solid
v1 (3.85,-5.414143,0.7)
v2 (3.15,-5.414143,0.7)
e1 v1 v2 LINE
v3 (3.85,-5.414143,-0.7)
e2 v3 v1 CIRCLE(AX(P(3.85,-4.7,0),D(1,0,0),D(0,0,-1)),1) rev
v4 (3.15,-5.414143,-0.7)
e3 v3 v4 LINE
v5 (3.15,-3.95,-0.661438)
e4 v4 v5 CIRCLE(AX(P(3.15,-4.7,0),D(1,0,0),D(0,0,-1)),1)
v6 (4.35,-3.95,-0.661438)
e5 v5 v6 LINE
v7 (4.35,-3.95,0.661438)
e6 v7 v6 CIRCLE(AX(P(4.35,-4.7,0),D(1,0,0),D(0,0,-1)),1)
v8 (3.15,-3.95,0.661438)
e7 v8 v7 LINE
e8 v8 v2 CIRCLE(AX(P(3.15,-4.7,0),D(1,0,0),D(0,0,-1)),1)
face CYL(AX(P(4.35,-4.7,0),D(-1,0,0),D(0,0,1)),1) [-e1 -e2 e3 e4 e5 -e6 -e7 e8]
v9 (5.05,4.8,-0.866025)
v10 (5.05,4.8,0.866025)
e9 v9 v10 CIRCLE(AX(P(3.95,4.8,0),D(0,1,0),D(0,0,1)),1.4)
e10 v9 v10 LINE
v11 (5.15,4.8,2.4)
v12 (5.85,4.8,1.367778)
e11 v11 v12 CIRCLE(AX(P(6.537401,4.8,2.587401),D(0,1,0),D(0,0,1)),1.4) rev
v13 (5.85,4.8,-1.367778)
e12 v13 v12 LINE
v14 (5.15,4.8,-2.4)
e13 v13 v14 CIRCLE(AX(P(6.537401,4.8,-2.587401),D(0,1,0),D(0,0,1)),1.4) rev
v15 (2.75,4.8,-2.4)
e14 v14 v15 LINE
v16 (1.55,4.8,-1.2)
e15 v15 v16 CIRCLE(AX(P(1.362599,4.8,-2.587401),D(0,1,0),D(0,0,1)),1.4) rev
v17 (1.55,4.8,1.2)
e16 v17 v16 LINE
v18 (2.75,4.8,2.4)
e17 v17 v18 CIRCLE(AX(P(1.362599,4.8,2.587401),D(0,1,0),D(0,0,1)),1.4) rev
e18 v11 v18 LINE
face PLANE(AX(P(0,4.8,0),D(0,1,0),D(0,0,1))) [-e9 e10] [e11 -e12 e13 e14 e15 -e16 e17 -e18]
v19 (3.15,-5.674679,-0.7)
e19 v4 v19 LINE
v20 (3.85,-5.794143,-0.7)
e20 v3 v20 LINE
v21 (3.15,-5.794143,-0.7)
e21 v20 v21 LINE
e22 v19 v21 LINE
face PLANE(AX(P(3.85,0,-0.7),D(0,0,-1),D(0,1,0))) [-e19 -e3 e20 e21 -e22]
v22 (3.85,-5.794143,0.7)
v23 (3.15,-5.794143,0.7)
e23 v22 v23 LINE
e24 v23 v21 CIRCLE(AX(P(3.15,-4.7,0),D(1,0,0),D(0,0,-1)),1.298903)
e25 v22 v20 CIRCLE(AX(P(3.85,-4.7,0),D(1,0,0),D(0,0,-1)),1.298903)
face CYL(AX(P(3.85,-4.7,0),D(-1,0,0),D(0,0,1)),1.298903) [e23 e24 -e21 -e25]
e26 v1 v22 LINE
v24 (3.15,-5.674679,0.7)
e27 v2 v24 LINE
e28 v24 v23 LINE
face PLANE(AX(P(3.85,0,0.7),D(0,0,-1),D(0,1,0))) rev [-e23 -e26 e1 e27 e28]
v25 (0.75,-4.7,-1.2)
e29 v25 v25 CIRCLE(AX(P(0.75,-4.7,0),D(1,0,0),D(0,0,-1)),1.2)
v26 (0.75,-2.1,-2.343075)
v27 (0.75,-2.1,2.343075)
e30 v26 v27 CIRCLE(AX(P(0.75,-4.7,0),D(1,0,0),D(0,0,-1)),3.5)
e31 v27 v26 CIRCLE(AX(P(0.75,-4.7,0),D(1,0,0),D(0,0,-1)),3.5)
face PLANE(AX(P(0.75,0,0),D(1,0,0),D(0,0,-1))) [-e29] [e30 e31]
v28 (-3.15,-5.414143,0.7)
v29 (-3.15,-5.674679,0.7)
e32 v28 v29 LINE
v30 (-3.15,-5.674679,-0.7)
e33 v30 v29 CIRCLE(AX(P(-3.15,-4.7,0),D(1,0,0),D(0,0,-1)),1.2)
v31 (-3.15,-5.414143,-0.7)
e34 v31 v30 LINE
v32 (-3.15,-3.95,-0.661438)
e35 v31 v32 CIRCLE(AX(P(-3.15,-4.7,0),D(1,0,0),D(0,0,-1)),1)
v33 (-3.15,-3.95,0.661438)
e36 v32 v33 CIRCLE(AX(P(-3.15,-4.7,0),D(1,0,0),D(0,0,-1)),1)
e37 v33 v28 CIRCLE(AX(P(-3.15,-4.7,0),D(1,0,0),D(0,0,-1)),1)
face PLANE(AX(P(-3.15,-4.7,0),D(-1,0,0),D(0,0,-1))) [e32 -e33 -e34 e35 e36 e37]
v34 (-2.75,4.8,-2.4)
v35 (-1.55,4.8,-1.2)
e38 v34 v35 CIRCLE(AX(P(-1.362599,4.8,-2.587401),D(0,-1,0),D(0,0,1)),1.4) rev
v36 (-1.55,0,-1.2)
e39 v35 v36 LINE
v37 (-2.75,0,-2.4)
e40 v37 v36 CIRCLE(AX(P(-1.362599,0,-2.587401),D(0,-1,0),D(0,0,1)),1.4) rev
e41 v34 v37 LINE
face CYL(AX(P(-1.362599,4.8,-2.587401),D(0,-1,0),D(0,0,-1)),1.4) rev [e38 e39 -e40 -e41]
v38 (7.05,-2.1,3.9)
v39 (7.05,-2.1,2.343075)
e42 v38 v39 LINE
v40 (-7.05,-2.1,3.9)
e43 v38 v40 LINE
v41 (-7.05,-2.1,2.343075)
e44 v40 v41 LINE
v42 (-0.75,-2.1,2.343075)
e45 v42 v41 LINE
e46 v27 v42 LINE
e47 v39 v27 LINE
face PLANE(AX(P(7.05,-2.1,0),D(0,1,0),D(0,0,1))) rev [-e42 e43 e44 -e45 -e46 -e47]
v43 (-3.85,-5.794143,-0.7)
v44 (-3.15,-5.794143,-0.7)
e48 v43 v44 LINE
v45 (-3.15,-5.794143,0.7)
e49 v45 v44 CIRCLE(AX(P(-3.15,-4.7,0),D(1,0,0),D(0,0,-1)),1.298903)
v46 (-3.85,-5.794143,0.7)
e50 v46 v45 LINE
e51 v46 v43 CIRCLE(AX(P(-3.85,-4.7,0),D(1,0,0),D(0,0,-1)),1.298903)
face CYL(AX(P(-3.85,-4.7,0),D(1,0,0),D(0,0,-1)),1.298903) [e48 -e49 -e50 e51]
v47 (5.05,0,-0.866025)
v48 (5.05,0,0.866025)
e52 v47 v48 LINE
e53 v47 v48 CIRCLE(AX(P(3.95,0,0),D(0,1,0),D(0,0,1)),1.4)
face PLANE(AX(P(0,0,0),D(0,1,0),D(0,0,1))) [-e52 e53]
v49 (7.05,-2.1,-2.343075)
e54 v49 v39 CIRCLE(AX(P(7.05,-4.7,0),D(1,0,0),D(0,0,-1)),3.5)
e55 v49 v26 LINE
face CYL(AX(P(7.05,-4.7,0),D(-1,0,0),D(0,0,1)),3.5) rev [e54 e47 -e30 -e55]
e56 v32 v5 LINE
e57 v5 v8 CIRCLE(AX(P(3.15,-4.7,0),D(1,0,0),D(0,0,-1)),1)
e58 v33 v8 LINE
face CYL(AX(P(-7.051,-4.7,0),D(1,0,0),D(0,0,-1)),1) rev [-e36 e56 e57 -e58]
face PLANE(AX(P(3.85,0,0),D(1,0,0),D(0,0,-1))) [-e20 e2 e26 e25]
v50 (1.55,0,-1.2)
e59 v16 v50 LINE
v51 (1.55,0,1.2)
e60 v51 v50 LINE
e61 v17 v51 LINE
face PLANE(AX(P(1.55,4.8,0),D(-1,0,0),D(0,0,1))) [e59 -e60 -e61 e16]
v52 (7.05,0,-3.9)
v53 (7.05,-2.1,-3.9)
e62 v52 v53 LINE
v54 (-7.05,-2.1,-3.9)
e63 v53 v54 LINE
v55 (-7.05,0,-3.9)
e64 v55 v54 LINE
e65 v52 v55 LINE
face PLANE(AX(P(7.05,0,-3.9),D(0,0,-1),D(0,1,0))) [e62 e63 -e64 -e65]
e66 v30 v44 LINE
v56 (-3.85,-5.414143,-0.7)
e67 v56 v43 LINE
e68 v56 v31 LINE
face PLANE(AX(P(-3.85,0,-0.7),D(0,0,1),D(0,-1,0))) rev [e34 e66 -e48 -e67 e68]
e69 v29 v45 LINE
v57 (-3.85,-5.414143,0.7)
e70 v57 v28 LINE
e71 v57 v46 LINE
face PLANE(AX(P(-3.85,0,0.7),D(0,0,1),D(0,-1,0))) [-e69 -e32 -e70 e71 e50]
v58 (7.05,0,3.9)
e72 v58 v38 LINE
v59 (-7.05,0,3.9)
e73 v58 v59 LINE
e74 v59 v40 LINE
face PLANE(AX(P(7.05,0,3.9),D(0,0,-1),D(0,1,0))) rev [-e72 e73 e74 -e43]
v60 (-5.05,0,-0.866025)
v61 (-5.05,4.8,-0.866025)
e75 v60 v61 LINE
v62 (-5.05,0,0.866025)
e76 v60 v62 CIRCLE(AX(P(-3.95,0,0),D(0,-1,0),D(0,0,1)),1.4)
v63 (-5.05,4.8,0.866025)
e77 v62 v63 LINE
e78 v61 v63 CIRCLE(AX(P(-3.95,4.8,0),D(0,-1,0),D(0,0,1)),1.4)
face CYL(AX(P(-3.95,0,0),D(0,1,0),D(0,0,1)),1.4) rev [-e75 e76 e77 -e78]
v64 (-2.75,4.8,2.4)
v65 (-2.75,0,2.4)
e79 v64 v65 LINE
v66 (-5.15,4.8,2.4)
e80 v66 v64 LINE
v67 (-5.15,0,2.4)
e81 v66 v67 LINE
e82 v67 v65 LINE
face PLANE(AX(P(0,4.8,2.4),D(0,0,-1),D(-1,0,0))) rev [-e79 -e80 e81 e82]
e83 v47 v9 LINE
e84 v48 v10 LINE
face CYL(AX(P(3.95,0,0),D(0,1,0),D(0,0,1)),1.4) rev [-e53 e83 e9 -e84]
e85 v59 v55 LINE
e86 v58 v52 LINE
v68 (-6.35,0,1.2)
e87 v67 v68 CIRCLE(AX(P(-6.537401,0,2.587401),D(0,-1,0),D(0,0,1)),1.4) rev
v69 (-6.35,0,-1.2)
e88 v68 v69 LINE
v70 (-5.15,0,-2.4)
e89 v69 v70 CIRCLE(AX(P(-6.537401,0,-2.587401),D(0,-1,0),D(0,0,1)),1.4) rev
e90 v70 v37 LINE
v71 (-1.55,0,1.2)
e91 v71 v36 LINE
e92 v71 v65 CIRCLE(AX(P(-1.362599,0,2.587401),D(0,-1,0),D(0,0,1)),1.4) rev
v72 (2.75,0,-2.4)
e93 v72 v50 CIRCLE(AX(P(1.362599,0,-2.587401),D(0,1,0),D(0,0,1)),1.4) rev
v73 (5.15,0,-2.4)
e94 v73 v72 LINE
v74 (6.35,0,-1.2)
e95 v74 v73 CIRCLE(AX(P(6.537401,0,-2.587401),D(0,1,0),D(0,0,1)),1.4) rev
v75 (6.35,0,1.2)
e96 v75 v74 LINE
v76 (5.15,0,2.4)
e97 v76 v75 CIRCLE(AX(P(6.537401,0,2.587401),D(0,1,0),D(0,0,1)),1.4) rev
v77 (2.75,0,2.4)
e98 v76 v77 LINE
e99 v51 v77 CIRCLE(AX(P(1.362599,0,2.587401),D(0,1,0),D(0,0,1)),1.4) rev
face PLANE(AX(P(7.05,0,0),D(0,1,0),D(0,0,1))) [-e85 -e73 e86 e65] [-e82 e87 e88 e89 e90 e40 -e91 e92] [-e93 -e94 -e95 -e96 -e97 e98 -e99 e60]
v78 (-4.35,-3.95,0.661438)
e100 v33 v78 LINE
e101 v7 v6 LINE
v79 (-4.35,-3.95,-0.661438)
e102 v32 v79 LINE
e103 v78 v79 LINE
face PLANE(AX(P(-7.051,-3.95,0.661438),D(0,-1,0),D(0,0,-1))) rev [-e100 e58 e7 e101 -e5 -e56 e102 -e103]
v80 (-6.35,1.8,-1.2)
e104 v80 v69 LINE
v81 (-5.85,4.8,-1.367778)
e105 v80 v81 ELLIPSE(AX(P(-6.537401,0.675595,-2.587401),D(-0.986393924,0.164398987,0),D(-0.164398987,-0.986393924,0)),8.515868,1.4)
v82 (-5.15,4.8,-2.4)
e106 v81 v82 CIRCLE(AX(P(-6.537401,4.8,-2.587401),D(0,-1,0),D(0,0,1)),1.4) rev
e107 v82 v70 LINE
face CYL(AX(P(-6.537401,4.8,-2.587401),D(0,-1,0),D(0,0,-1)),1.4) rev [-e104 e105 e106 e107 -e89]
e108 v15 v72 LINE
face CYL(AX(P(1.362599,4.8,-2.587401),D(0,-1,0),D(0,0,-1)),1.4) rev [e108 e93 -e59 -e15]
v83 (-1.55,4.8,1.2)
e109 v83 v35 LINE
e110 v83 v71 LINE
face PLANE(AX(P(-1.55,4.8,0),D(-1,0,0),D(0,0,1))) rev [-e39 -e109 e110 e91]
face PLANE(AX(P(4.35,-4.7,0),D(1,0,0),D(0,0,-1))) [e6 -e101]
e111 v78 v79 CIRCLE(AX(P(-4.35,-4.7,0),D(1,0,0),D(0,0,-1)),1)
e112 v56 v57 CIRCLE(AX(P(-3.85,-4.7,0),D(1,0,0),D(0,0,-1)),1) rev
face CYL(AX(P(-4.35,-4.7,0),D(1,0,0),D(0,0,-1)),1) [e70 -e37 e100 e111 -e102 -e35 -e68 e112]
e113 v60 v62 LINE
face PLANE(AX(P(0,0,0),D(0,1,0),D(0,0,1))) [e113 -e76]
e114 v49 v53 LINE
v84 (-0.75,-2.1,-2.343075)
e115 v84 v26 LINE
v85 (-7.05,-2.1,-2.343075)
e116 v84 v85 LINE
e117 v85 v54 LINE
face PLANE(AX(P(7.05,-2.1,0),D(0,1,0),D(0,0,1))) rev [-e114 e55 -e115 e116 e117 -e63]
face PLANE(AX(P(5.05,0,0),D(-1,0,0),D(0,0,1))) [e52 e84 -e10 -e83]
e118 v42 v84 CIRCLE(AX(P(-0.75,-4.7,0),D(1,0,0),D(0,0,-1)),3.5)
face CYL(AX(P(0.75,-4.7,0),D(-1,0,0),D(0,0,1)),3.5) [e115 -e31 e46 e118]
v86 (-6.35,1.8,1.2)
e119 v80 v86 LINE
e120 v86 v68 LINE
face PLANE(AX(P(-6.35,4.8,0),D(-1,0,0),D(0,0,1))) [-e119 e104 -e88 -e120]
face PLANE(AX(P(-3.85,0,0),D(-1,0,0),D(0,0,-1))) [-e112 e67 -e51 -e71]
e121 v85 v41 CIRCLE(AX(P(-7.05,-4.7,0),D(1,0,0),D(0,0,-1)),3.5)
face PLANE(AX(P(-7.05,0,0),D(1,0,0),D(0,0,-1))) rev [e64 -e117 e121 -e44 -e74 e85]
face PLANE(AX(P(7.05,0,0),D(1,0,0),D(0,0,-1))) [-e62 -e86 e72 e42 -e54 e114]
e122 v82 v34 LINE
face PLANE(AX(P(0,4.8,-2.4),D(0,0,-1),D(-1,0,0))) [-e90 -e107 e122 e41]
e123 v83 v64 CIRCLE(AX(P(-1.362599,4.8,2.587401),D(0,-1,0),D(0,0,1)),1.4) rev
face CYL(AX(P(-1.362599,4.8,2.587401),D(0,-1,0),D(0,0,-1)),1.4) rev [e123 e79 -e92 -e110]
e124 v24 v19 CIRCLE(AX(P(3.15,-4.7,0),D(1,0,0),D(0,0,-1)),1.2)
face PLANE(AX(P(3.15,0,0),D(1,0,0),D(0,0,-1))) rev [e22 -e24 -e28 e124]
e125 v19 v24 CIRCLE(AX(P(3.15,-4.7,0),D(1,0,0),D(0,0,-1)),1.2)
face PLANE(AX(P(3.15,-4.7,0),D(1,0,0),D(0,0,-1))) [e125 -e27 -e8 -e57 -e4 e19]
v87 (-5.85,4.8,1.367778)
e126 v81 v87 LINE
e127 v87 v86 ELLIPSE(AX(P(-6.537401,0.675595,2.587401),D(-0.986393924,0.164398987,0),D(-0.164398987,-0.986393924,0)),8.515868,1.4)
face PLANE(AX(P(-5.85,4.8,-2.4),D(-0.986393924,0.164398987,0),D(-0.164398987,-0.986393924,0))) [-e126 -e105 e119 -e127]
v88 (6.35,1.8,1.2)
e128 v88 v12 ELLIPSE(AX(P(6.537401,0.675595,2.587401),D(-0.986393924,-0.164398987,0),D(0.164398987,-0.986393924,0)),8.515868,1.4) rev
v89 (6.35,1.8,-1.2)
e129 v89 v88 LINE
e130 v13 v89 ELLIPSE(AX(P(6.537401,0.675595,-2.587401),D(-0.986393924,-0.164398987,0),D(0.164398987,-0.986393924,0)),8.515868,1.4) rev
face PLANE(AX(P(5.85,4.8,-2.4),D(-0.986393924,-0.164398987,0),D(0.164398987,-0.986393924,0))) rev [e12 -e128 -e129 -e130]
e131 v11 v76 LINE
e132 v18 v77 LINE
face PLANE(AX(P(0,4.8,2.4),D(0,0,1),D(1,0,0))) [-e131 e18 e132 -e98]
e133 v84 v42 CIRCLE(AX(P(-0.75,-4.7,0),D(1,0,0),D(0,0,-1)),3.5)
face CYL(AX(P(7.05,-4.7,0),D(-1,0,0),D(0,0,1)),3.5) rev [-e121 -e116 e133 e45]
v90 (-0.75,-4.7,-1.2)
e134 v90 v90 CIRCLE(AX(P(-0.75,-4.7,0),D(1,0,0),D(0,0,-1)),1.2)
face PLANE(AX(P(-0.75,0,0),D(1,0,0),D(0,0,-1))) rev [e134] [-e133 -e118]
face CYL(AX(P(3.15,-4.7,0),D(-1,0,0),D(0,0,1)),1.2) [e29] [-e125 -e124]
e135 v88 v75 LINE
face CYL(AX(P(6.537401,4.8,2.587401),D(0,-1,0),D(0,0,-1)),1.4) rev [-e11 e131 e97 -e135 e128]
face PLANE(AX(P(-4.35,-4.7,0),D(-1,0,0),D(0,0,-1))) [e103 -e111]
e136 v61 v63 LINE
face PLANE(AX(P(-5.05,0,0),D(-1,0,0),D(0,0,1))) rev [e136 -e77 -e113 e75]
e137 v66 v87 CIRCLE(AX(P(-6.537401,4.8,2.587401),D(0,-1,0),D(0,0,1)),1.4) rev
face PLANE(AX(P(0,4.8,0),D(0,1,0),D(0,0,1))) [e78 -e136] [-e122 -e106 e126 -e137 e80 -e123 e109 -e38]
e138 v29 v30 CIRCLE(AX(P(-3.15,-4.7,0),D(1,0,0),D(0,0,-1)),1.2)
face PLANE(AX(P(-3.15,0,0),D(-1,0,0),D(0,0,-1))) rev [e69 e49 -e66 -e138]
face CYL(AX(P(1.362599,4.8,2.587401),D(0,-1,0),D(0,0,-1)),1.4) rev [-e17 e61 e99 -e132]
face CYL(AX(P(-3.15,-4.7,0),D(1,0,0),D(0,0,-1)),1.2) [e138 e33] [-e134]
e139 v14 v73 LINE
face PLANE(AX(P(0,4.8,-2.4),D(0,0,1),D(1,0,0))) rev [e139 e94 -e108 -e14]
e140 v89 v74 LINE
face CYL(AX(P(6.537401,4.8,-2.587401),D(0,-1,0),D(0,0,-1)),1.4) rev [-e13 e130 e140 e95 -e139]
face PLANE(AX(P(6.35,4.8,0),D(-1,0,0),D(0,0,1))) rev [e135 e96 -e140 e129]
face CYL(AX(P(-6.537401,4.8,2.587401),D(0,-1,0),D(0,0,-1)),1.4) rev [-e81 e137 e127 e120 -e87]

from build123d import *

# Parameters (mm, degrees)
SALIENTE_EXTRUIR1_DEPTH = 7.05
SALIENTE_EXTRUIR2_DEPTH = 0.75
CROQUIS2_R              = 1.2
SALIENTE_EXTRUIR3_DEPTH = 2.4
CROQUIS3_R              = 1
SALIENTE_EXTRUIR4_DEPTH = 1.2
CORTAR_EXTRUIR1_REACH   = 16.574
SALIENTE_EXTRUIR5_DEPTH = 0.7
SALIENTE_EXTRUIR6_DEPTH = 4.8
CORTAR_EXTRUIR2_DEPTH   = 4.8
CORTAR_EXTRUIR4_DEPTH   = 4.8


with BuildPart() as part:
    # Croquis1 → Saliente-Extruir1 (new, symmetric)
    with BuildSketch(Plane(origin=(0, 0, 0), x_dir=(0, 0, -1), z_dir=(1, 0, 0))):
        with BuildLine():
            ThreePointArc((-2.343074903, -2.1), (0, -1.2), (2.343074903, -2.1))
            Line((2.343074903, -2.1), (3.9, -2.1))
            Line((3.9, -2.1), (3.9, 0))
            Line((3.9, 0), (-3.9, 0))
            Line((-3.9, 0), (-3.9, -2.1))
            Line((-3.9, -2.1), (-2.343074903, -2.1))
        make_face()
    extrude(amount=SALIENTE_EXTRUIR1_DEPTH, both=True)

    # Croquis1<3> → Saliente-Extruir2 (add, symmetric)
    with BuildSketch(Plane(origin=(0, 0, 0), x_dir=(0, 0, -1), z_dir=(1, 0, 0))):
        with BuildLine():
            ThreePointArc((3.5, -4.7), (3.197714978, -3.277108957), (2.343074903, -2.1))
            ThreePointArc((2.343074903, -2.1), (0, -1.2), (-2.343074903, -2.1))
            ThreePointArc((-2.343074903, -2.1), (-1.422891043, -7.897714978), (3.5, -4.7))
        make_face()
    extrude(amount=SALIENTE_EXTRUIR2_DEPTH, both=True)

    # Croquis2 → Saliente-Extruir3 (add)
    with BuildSketch(Plane(origin=(0.75, 0, 0), x_dir=(0, 0, -1), z_dir=(1, 0, 0))):
        with Locations((0, -4.7)):
            Circle(CROQUIS2_R)
    saliente_extruir3 = extrude(amount=SALIENTE_EXTRUIR3_DEPTH)

    # Croquis3 → Saliente-Extruir4 (add)
    with BuildSketch(Plane(origin=(3.15, 0, 0), x_dir=(0, 0, -1), z_dir=(1, 0, 0))):
        with Locations((0, -4.7)):
            Circle(CROQUIS3_R)
    saliente_extruir4 = extrude(amount=SALIENTE_EXTRUIR4_DEPTH)

    # Croquis4 → Cortar-Extruir1 (cut, up to next)
    with BuildSketch(Plane(origin=(4.35, 0, 0), x_dir=(0, 0, -1), z_dir=(1, 0, 0)), mode=Mode.PRIVATE) as cortar_extruir1_sk1:
        with BuildLine():
            Line((-0.661437828, -3.95), (0.661437828, -3.95))
            ThreePointArc((0.661437828, -3.95), (0, -3.7), (-0.661437828, -3.95))
        make_face()
    cortar_extruir1_tool1 = extrude(cortar_extruir1_sk1.sketch, amount=-CORTAR_EXTRUIR1_REACH, mode=Mode.PRIVATE) & part.part
    cortar_extruir1 = cortar_extruir1_tool1.solids().sort_by_distance((4.35, -3.848845, 0))[0]
    add(cortar_extruir1, mode=Mode.SUBTRACT)

    # Croquis5 → Saliente-Extruir5 (add)
    with BuildSketch(Plane(origin=(3.15, 0, 0), x_dir=(0, 0, -1), z_dir=(1, 0, 0))):
        with BuildLine():
            ThreePointArc((0.7, -5.414142843), (0, -5.7), (-0.7, -5.414142843))
            Line((-0.7, -5.414142843), (-0.7, -5.794142843))
            ThreePointArc((-0.7, -5.794142843), (0, -5.99890283), (0.7, -5.794142843))
            Line((0.7, -5.794142843), (0.7, -5.414142843))
        make_face()
    saliente_extruir5 = extrude(amount=SALIENTE_EXTRUIR5_DEPTH)

    # Croquis6 → Saliente-Extruir6 (add)
    with BuildSketch(Plane(origin=(0, 0, 0), x_dir=(1, 0, 0), z_dir=(0, 1, 0))):
        with BuildLine():
            Line((2.75, -2.4), (5.15, -2.4))
            ThreePointArc((5.15, -2.4), (5.547451294, -1.597451294), (6.35, -1.2))
            Line((6.35, -1.2), (6.35, 1.2))
            ThreePointArc((6.35, 1.2), (5.547451294, 1.597451294), (5.15, 2.4))
            Line((5.15, 2.4), (2.75, 2.4))
            ThreePointArc((2.75, 2.4), (2.352548706, 1.597451294), (1.55, 1.2))
            Line((1.55, 1.2), (1.55, -1.2))
            ThreePointArc((1.55, -1.2), (2.352548706, -1.597451294), (2.75, -2.4))
        make_face()
    saliente_extruir6 = extrude(amount=SALIENTE_EXTRUIR6_DEPTH)

    # Croquis7 → Cortar-Extruir2 (cut)
    with BuildSketch(Plane(origin=(0, 4.8, 0), x_dir=(1, 0, 0), z_dir=(0, 1, 0))):
        with BuildLine():
            ThreePointArc((5.05, 0.866025404), (2.55, 0), (5.05, -0.866025404))
            Line((5.05, -0.866025404), (5.05, 0.866025404))
        make_face()
    cortar_extruir2 = extrude(amount=-CORTAR_EXTRUIR2_DEPTH, mode=Mode.SUBTRACT)

    # Croquis8 → Cortar-Extruir4 (cut)
    with BuildSketch(Plane.XY.offset(2.4)):
        Polygon((5.85, 4.8), (6.35, 1.8), (6.35, 4.8), align=None)
    cortar_extruir4 = extrude(amount=-CORTAR_EXTRUIR4_DEPTH, mode=Mode.SUBTRACT)

    # Simetría1: Saliente-Extruir3, Saliente-Extruir4, Cortar-Extruir1, Saliente-Extruir5, Saliente-Extruir6, Cortar-Extruir2, Cortar-Extruir4 across plane
    add(saliente_extruir3.mirror(Plane(origin=(0, 0, 0), x_dir=(0, 0, 1), z_dir=(1, 0, 0))))
    add(saliente_extruir4.mirror(Plane(origin=(0, 0, 0), x_dir=(0, 0, 1), z_dir=(1, 0, 0))))
    add(cortar_extruir1.mirror(Plane(origin=(0, 0, 0), x_dir=(0, 0, 1), z_dir=(1, 0, 0))), mode=Mode.SUBTRACT)
    add(saliente_extruir5.mirror(Plane(origin=(0, 0, 0), x_dir=(0, 0, 1), z_dir=(1, 0, 0))))
    add(saliente_extruir6.mirror(Plane(origin=(0, 0, 0), x_dir=(0, 0, 1), z_dir=(1, 0, 0))))
    add(cortar_extruir2.mirror(Plane(origin=(0, 0, 0), x_dir=(0, 0, 1), z_dir=(1, 0, 0))), mode=Mode.SUBTRACT)
    add(cortar_extruir4.mirror(Plane(origin=(0, 0, 0), x_dir=(0, 0, 1), z_dir=(1, 0, 0))), mode=Mode.SUBTRACT)


solid = part.part
